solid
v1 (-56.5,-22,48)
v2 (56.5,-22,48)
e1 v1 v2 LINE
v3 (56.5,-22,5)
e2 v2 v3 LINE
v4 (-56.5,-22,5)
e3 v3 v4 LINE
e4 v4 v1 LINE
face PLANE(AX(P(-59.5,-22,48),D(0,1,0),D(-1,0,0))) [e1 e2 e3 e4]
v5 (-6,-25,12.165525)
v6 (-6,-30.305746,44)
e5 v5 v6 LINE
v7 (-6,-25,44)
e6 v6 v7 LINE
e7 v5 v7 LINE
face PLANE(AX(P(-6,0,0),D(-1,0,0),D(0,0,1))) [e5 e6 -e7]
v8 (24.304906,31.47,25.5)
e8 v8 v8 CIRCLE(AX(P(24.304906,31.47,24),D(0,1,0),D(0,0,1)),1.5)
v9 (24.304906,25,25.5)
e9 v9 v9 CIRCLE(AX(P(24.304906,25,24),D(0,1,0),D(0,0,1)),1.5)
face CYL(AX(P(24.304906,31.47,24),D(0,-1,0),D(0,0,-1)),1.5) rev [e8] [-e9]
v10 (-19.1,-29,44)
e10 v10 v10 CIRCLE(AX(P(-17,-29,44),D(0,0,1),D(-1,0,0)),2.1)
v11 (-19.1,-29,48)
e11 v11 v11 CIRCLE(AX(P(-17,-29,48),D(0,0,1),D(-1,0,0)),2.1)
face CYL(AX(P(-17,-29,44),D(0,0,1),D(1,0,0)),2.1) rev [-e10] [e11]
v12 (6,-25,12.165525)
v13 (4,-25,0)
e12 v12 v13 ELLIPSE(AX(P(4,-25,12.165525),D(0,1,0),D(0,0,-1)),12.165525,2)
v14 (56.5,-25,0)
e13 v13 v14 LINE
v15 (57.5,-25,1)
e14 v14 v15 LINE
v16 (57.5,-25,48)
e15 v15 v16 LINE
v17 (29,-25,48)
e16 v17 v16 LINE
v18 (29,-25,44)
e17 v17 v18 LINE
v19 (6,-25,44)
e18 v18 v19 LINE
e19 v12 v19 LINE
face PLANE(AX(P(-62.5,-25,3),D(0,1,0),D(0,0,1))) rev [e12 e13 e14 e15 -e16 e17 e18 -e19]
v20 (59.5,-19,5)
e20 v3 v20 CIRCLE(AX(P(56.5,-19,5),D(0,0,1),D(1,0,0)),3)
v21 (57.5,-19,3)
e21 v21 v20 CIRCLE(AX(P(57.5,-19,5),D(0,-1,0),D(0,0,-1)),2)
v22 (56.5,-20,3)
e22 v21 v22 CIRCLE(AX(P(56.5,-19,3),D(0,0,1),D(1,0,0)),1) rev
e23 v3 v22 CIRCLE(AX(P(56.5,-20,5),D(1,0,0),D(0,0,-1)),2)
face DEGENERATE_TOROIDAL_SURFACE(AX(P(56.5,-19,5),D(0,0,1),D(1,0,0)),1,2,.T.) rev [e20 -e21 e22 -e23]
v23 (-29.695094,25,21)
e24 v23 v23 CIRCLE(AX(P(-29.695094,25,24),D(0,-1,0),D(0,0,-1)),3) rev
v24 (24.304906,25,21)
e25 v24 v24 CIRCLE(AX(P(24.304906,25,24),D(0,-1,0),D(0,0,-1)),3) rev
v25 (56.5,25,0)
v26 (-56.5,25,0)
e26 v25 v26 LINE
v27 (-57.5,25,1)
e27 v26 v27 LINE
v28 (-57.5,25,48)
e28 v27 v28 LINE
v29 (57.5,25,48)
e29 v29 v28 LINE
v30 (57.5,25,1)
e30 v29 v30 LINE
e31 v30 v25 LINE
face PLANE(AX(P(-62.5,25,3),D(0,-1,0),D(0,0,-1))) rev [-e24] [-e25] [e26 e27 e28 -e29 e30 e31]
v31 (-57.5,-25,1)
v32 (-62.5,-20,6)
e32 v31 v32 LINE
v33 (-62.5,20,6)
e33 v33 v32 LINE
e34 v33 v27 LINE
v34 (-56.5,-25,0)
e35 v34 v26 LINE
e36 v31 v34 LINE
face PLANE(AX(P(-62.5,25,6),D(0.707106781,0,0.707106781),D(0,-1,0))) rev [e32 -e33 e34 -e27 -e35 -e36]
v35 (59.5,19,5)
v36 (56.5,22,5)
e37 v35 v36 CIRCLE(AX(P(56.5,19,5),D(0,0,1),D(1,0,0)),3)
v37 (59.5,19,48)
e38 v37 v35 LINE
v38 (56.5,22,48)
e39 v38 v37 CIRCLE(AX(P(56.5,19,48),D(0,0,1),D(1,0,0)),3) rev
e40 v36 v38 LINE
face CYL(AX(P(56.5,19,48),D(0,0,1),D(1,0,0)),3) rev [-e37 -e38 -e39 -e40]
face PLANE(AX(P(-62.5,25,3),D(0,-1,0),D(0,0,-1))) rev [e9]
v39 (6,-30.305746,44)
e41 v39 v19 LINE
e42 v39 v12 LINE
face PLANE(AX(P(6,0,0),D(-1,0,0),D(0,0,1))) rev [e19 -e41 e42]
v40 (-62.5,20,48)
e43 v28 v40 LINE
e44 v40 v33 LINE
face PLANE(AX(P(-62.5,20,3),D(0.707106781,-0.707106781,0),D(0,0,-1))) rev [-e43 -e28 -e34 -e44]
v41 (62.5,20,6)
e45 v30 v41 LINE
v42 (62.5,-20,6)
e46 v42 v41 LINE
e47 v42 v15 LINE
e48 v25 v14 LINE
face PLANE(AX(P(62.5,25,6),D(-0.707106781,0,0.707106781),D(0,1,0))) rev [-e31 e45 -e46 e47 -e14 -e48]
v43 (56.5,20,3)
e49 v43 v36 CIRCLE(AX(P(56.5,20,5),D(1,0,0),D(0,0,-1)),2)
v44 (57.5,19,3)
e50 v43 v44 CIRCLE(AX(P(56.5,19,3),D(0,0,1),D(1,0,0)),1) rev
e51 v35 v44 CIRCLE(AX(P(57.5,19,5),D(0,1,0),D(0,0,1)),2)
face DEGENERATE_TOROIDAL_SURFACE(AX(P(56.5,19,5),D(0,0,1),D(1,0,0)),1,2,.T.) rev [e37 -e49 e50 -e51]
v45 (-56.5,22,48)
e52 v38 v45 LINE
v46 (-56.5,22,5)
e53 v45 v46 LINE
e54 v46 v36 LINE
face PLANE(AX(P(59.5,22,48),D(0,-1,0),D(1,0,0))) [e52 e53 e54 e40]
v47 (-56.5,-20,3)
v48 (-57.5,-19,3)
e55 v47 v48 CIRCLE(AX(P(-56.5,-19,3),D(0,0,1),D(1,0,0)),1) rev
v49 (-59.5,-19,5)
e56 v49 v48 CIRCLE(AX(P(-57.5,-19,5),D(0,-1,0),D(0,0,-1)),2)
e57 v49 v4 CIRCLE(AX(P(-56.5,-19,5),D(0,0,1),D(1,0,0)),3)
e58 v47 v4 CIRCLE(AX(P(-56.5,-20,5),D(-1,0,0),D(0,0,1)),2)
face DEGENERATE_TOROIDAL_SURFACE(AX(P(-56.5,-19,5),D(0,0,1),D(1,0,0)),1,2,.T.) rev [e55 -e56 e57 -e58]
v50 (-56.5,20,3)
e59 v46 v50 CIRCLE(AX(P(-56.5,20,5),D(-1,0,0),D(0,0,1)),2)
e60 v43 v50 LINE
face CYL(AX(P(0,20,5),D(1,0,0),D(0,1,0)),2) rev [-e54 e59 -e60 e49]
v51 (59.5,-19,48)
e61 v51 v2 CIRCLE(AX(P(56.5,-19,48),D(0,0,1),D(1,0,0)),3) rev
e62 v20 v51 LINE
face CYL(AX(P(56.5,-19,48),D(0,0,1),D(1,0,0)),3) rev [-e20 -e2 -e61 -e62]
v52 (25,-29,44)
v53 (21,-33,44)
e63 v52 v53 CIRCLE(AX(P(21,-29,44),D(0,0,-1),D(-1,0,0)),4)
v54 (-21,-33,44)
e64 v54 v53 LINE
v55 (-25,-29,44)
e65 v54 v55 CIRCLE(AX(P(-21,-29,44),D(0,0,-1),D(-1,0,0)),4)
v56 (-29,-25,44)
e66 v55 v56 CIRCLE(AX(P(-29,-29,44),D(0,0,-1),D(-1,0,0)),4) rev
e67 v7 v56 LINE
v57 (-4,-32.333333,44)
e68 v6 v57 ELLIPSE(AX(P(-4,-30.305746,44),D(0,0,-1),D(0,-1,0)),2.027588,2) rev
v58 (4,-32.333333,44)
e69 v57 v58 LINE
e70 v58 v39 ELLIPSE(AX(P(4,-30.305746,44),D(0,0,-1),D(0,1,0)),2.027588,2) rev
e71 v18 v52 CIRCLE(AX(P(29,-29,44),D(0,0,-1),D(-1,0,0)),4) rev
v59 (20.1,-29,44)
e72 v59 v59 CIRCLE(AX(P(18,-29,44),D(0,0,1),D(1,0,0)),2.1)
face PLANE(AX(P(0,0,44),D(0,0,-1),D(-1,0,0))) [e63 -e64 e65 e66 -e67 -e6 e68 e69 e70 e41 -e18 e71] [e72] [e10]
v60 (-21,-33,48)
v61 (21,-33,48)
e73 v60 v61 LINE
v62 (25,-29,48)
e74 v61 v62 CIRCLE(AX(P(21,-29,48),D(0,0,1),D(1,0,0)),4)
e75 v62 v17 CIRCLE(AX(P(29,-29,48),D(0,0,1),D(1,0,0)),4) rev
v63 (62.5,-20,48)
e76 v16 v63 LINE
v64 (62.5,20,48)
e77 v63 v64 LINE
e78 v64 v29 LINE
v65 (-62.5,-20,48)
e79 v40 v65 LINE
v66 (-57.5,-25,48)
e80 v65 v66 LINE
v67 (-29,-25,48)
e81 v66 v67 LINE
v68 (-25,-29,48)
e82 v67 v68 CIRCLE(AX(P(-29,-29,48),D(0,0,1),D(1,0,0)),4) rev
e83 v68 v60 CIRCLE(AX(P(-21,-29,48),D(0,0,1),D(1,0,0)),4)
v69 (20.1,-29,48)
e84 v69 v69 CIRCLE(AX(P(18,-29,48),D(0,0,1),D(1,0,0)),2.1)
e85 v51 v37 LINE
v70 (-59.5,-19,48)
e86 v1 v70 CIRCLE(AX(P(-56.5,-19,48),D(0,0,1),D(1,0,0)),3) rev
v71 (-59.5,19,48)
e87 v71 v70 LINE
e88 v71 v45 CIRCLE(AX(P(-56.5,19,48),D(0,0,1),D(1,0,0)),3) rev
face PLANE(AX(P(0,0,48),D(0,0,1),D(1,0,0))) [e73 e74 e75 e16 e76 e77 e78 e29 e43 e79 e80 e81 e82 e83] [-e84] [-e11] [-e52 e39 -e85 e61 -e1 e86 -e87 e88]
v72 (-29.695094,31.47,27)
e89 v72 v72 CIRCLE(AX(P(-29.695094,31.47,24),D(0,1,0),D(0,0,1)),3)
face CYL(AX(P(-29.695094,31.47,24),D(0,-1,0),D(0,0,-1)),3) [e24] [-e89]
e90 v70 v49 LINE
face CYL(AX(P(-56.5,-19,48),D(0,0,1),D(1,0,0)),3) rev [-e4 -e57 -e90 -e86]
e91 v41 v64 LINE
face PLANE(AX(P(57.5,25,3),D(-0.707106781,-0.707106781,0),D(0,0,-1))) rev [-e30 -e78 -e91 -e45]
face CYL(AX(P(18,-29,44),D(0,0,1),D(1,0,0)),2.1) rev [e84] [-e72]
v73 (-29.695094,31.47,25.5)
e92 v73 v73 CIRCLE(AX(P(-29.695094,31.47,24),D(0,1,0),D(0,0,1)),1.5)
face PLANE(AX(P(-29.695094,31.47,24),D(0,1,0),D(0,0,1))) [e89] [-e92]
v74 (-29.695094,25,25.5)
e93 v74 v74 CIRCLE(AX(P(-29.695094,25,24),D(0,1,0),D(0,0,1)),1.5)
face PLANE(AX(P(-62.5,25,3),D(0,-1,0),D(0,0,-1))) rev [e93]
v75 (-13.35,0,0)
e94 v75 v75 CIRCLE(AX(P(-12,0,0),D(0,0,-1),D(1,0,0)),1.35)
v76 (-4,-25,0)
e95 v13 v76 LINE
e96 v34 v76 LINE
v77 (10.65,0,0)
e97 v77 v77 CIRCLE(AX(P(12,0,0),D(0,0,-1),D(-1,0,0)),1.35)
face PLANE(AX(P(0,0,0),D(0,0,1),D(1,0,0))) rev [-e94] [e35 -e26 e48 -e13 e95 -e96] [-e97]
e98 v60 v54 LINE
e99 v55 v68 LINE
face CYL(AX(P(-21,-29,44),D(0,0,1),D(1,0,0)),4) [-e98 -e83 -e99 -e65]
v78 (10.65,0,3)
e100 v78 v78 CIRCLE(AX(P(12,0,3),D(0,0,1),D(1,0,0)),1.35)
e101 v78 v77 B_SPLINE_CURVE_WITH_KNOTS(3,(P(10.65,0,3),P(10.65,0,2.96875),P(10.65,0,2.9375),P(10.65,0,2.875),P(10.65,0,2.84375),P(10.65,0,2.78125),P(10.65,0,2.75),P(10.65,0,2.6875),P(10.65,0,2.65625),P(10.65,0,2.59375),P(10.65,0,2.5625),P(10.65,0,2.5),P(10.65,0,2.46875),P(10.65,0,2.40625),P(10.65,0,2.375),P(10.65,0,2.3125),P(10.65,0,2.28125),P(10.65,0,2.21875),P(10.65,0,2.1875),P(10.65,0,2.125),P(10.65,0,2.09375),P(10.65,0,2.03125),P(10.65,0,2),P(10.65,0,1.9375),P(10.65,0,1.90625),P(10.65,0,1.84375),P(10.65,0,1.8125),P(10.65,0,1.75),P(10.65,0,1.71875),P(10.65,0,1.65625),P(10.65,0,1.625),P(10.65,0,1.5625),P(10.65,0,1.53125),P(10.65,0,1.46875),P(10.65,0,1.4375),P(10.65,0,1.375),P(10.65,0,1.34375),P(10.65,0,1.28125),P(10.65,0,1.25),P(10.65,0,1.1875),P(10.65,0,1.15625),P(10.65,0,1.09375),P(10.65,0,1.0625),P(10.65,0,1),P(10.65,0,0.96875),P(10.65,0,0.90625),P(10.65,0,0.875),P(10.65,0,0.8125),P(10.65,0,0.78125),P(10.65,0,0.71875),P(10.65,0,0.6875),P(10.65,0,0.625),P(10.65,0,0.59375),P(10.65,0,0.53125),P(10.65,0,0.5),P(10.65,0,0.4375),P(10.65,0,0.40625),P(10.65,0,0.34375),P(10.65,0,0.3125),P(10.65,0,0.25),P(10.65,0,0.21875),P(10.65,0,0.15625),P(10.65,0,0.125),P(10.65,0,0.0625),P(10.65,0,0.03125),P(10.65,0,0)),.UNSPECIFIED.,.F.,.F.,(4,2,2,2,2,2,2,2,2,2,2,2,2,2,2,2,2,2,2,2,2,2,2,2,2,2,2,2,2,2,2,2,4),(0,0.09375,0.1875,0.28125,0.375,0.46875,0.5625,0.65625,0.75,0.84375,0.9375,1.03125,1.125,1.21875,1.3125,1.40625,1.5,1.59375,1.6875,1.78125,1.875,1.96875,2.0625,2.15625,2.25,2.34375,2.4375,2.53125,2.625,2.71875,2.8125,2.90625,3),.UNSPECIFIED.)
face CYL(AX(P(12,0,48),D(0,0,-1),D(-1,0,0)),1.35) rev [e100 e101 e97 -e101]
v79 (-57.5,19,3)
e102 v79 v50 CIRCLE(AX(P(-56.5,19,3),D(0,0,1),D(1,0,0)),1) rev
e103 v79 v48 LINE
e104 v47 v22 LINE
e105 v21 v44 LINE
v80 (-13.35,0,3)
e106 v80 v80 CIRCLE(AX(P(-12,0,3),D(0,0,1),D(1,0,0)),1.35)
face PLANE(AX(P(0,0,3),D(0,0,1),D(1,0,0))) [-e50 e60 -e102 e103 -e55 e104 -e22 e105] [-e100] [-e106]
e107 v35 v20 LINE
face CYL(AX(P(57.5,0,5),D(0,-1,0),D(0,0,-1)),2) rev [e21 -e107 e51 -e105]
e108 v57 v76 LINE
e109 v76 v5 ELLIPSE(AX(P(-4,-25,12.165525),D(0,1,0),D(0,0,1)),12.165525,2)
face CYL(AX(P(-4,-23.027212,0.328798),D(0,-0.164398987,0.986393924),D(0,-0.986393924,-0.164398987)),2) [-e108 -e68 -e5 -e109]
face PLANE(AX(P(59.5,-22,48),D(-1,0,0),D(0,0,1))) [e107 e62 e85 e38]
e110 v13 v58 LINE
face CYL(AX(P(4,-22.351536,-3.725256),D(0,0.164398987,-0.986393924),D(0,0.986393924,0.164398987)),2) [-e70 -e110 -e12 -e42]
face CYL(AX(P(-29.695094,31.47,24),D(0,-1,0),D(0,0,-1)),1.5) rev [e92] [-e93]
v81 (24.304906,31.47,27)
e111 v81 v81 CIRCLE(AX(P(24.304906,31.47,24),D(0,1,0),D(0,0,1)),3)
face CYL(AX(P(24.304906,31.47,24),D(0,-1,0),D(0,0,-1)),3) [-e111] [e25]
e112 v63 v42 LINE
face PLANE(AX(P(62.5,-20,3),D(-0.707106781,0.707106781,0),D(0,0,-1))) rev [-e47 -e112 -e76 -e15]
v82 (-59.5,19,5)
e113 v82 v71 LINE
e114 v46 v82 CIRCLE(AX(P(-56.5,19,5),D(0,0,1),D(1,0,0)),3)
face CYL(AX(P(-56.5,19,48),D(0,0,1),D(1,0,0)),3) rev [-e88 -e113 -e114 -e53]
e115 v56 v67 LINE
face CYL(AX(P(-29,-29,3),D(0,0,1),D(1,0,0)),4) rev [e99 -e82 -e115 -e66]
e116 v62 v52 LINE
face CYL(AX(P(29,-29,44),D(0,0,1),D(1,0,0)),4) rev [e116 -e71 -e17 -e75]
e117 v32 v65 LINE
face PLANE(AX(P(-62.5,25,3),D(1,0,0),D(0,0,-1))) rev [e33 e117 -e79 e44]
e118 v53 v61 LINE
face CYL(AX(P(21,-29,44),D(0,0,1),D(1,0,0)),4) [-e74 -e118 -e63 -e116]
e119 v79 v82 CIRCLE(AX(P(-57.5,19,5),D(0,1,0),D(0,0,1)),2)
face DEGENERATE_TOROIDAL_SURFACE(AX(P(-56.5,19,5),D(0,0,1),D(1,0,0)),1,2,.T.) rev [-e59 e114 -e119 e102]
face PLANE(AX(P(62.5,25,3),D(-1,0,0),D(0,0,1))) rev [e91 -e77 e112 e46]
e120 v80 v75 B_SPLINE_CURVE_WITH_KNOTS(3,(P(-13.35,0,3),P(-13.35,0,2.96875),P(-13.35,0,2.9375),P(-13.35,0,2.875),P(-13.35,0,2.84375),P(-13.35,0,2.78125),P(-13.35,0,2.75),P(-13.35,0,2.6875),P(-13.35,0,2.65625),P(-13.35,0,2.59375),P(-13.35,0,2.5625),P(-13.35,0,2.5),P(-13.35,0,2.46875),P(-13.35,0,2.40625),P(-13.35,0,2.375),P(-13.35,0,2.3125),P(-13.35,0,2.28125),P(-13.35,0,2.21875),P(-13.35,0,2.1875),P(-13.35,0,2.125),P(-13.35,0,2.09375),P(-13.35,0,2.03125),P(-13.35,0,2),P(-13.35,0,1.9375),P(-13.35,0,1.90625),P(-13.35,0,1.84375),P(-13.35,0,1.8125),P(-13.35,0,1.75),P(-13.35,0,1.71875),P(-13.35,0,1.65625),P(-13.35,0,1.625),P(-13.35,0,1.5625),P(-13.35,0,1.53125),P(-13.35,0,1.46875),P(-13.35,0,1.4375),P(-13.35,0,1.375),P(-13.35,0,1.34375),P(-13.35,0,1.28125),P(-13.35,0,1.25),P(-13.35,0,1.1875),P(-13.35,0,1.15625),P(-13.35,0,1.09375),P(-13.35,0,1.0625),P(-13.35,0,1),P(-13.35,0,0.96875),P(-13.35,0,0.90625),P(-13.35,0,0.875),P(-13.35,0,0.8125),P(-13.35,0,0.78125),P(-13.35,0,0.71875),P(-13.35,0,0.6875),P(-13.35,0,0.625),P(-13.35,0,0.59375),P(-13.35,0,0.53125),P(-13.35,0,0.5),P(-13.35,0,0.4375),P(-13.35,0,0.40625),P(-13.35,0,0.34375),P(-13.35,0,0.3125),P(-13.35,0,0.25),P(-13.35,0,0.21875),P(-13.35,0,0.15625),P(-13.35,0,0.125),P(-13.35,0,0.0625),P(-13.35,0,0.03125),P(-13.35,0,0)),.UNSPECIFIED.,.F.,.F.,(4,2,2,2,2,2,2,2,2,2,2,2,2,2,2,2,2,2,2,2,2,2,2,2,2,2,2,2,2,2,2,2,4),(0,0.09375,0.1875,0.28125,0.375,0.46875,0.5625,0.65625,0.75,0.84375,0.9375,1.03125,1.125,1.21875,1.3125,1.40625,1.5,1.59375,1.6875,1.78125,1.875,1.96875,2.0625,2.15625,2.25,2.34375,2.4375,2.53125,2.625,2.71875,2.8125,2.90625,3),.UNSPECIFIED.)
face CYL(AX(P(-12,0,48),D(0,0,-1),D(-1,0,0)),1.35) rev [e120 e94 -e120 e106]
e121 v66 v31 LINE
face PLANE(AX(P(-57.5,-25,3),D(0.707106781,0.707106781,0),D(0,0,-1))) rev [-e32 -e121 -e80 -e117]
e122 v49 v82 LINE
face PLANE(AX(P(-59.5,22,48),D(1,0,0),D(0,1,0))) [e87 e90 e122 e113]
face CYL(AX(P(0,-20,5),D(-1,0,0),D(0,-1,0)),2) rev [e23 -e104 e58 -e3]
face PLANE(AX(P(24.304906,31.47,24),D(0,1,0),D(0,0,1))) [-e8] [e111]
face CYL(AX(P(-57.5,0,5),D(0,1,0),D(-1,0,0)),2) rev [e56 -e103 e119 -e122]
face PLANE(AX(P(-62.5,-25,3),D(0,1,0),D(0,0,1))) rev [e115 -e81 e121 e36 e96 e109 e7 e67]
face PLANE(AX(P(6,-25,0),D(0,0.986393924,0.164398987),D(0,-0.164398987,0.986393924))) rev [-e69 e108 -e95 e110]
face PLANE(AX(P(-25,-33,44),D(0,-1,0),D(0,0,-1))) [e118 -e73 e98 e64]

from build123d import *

# Parameters (mm, degrees)
SKETCH_1_W             = 125
SKETCH_1_H             = 50
EXTRUDE_1_DEPTH        = 3
SKETCH_2_W             = 125
SKETCH_2_H             = 50
SKETCH_2_W_2           = 119
SKETCH_2_H_2           = 44
EXTRUDE_2_DEPTH        = 45
EXTRUDE_START          = 33
EXTRUDE_3_DEPTH        = 12
SKETCH_6_W             = 50
SKETCH_6_H             = 8
SKETCH_6_R             = 2.1
EXTRUDE_7_DEPTH        = 4
FILLET_START           = 43
FILLET_10_DEPTH        = 5
FILLET_START_2         = 44
FILLET_10_2_DEPTH      = 4
CHAMFER_2_SIZE         = 6
FILLET_12_R            = 2
CHAMFER_3_SIZE         = 5
SKETCH_7_R             = 1.35
CUT_EXTRUDE_1_DEPTH    = 86.435648297
PATTERN_LINEAR_2_COUNT = 2
PATTERN_LINEAR_2_PITCH = 39
FILLET_13_R            = 2
SKETCH_8_W             = 12
SKETCH_8_H             = 8
CUT_EXTRUDE_2_DEPTH    = 86.435648297
FILLET_14_R            = 3
SKETCH_9_W             = 61.451933819
SKETCH_9_H             = 10.261376853
CUT_EXTRUDE_3_DEPTH    = 70
SKETCH_10_R            = 3
SKETCH_10_R_2          = 1.5
EXTRUDE_8_DEPTH        = 6.47


with BuildPart() as part:
    # 草图1 → 凸台-拉伸1 (new body)
    with BuildSketch(Plane.XY):
        Rectangle(SKETCH_1_W, SKETCH_1_H)
    extrude(amount=EXTRUDE_1_DEPTH)

    # 草图2 → 凸台-拉伸2 (add)
    with BuildSketch(Plane.XY.offset(3)):
        Rectangle(SKETCH_2_W, SKETCH_2_H)
        Rectangle(SKETCH_2_W_2, SKETCH_2_H_2, mode=Mode.SUBTRACT)
    extrude(amount=EXTRUDE_2_DEPTH)

    # 草图3 → 凸台-拉伸3 (add)
    with BuildSketch(Plane(origin=(0, 0, 0), x_dir=(0, 0, -1), z_dir=(1, 0, 0)).offset(EXTRUDE_START)):
        Polygon((0, 25), (-48, 33), (-48, 25), align=None)
        Polygon((-48, -25), (0, -25), (-48, -33), align=None)
    extrude_3 = extrude(amount=EXTRUDE_3_DEPTH)

    # 草图6 → 凸台-拉伸7 (add)
    # profile 1 of 2: a face of its own
    with BuildSketch(Plane.XY.offset(48)):
        with Locations((0, 29)):
            Rectangle(SKETCH_6_W, SKETCH_6_H)
        with Locations((-17, 29)):
            Circle(SKETCH_6_R, mode=Mode.SUBTRACT)
        with Locations((18, 29)):
            Circle(SKETCH_6_R, mode=Mode.SUBTRACT)
    # profile 2 of 2: a face of its own
    with BuildSketch(Plane.XY.offset(48)):
        with Locations((0, -29)):
            Rectangle(SKETCH_6_W, SKETCH_6_H)
        with Locations(Location((-17, -29, 0), (0, 0, 180))):
            Circle(SKETCH_6_R, mode=Mode.SUBTRACT)
        with Locations((18, -29)):
            Circle(SKETCH_6_R, mode=Mode.SUBTRACT)
    extrude(amount=-EXTRUDE_7_DEPTH)

    # 圆角10: read off the stored shape, not the designer's step
    # 圆角10 outline → 圆角10 (cut)
    with BuildSketch(Plane.XY.offset(FILLET_START)):
        with BuildLine():
            ThreePointArc((25, -29), (23.828427125, -31.828427125), (21, -33))
            Line((21, -33), (25, -33))
            Line((25, -33), (25, -29))
        make_face()
        with BuildLine():
            Line((-25, -33), (-21, -33))
            ThreePointArc((-21, -33), (-23.828427125, -31.828427125), (-25, -29))
            Line((-25, -29), (-25, -33))
        make_face()
        with BuildLine():
            ThreePointArc((-25, 29), (-23.828427125, 31.828427125), (-21, 33))
            Line((-21, 33), (-25, 33))
            Line((-25, 33), (-25, 29))
        make_face()
        with BuildLine():
            Line((25, 33), (21, 33))
            ThreePointArc((21, 33), (23.828427125, 31.828427125), (25, 29))
            Line((25, 29), (25, 33))
        make_face()
    extrude(amount=FILLET_10_DEPTH, mode=Mode.SUBTRACT)

    # Fillet 10 2 outline → Fillet 10 2 (add)
    with BuildSketch(Plane.XY.offset(FILLET_START_2)):
        with BuildLine():
            Line((25, -25), (25, -29))
            ThreePointArc((25, -29), (26.171572875, -26.171572875), (29, -25))
            Line((29, -25), (25, -25))
        make_face()
        with BuildLine():
            ThreePointArc((-29, -25), (-26.171572875, -26.171572875), (-25, -29))
            Line((-25, -29), (-25, -25))
            Line((-25, -25), (-29, -25))
        make_face()
        with BuildLine():
            Line((-25, 25), (-25, 29))
            ThreePointArc((-25, 29), (-26.171572875, 26.171572875), (-29, 25))
            Line((-29, 25), (-25, 25))
        make_face()
        with BuildLine():
            ThreePointArc((29, 25), (26.171572875, 26.171572875), (25, 29))
            Line((25, 29), (25, 25))
            Line((25, 25), (29, 25))
        make_face()
    extrude(amount=FILLET_10_2_DEPTH)

    # 倒角2
    chamfer_2_edges = [part.edges().sort_by_distance(p)[0] for p in [
        (-62.5, 0, 0),
        (62.5, 0, 0),
    ]]
    chamfer(chamfer_2_edges, length=CHAMFER_2_SIZE)

    # 圆角12
    fillet_12_edges = [part.edges().sort_by_distance(p)[0] for p in [
        (0, -22, 3),
        (59.5, 0, 3),
        (0, 22, 3),
        (-59.5, 0, 3),
    ]]
    fillet(fillet_12_edges, radius=FILLET_12_R)

    # 倒角3
    chamfer_3_edges = [part.edges().sort_by_distance(p)[0] for p in [
        (62.5, -25, 27),
        (-62.5, -25, 27),
        (-62.5, 25, 27),
        (62.5, 25, 27),
    ]]
    chamfer(chamfer_3_edges, length=CHAMFER_3_SIZE)

    # 草图7 → 切除-拉伸1 (cut, through all)
    with BuildSketch(Plane(origin=(0, 0, 0), x_dir=(-1, 0, 0), z_dir=(0, 0, -1))):
        with Locations((-12, 0)):
            Circle(SKETCH_7_R)
        with Locations((12, 0)):
            Circle(SKETCH_7_R)
    extrude(amount=-CUT_EXTRUDE_1_DEPTH, mode=Mode.SUBTRACT)

    # 阵列(线性)2: 凸台-拉伸3 ×2
    with Locations(*[(-i * PATTERN_LINEAR_2_PITCH, 0, 0) for i in range(1, PATTERN_LINEAR_2_COUNT)]):
        add(extrude_3)

    # 圆角13
    fillet_13_edges = [part.edges().sort_by_distance(p)[0] for p in [
        (-6, 28.666666667, 22),
        (6, 28.666666667, 22),
        (-6, -28.666666667, 22),
        (6, -28.666666667, 22),
    ]]
    fillet(fillet_13_edges, radius=FILLET_13_R)

    # 草图8 → 切除-拉伸2 (cut, through all)
    with BuildSketch(Plane.XY.offset(48)):
        with Locations((39, 29)):
            Rectangle(SKETCH_8_W, SKETCH_8_H)
        with Locations((39, -29)):
            Rectangle(SKETCH_8_W, SKETCH_8_H)
    extrude(amount=-CUT_EXTRUDE_2_DEPTH, mode=Mode.SUBTRACT)

    # 圆角14
    # the kernel refuses this fillet: 3 mm, written as the material it adds along each edge
    with BuildSketch(Plane(origin=(56.5, 19, 3), x_dir=(0, 1, 0), z_dir=(-1, 0, 0))) as fillet_14_piece_1:
        with BuildLine():
            CenterArc((1, -2), 2, 0, 90)
            Line((3, -2), (3, 0))
            Line((3, 0), (1, 0))
        make_face()
    revolve(axis=Axis((56.5, 19, 3), (0, 0, -1)), revolution_arc=90)
    with BuildSketch(Plane(origin=(56.5, -19, 3), x_dir=(1, 0, 0), z_dir=(0, 1, 0))) as fillet_14_piece_2:
        with BuildLine():
            CenterArc((1, -2), 2, 0, 90)
            Line((3, -2), (3, 0))
            Line((3, 0), (1, 0))
        make_face()
    revolve(axis=Axis((56.5, -19, 3), (0, 0, -1)), revolution_arc=90)
    with BuildSketch(Plane(origin=(-56.5, 19, 3), x_dir=(-1, 0, 0), z_dir=(0, -1, 0))) as fillet_14_piece_3:
        with BuildLine():
            CenterArc((1, -2), 2, 0, 90)
            Line((3, -2), (3, 0))
            Line((3, 0), (1, 0))
        make_face()
    revolve(axis=Axis((-56.5, 19, 3), (0, 0, -1)), revolution_arc=90)
    with BuildSketch(Plane(origin=(-56.5, -19, 3), x_dir=(0, -1, 0), z_dir=(1, 0, 0))) as fillet_14_piece_4:
        with BuildLine():
            CenterArc((1, -2), 2, 0, 90)
            Line((3, -2), (3, 0))
            Line((3, 0), (1, 0))
        make_face()
    revolve(axis=Axis((-56.5, -19, 3), (0, 0, -1)), revolution_arc=90)
    with BuildSketch(Plane(origin=(59.5, -22, 3), x_dir=(0, 1, 0), z_dir=(0, 0, 1))) as fillet_14_piece_5:
        with BuildLine():
            CenterArc((FILLET_14_R, FILLET_14_R), FILLET_14_R, 180, 90)
            Line((0, FILLET_14_R), (0, 0))
            Line((0, 0), (FILLET_14_R, 0))
        make_face()
    extrude(amount=45)
    with BuildSketch(Plane(origin=(59.5, 22, 3), x_dir=(0, -1, 0), z_dir=(0, 0, 1)), Plane(origin=(-59.5, 22, 3), x_dir=(1, 0, 0), z_dir=(0, 0, 1)), Plane(origin=(-59.5, -22, 3), x_dir=(0, 1, 0), z_dir=(0, 0, 1))) as fillet_14_piece_6:
        with BuildLine():
            CenterArc((FILLET_14_R, -FILLET_14_R), FILLET_14_R, 90, 90)
            Line((0, -FILLET_14_R), (0, 0))
            Line((0, 0), (FILLET_14_R, 0))
        make_face()
    extrude(amount=45)

    # 草图9 → 切除-拉伸3 (cut)
    with BuildSketch(Plane(origin=(0, 0, 0), x_dir=(-1, 0, 0), z_dir=(0, 0, -1))):
        with Locations((1.72596691, 30.130688427)):
            Rectangle(SKETCH_9_W, SKETCH_9_H)
    extrude(amount=-CUT_EXTRUDE_3_DEPTH, mode=Mode.SUBTRACT)

    # 草图10 → 凸台-拉伸8 (add)
    # profile 1 of 2: a face of its own
    with BuildSketch(Plane(origin=(0, 25, 0), x_dir=(1, 0, 0), z_dir=(0, 1, 0))):
        with Locations(Location((-29.695093854, -24, 0), (0, 0, 90))):
            Circle(SKETCH_10_R)
        with Locations(Location((-29.695093854, -24, 0), (0, 0, 270))):
            Circle(SKETCH_10_R_2, mode=Mode.SUBTRACT)
    # profile 2 of 2: a face of its own
    with BuildSketch(Plane(origin=(0, 25, 0), x_dir=(1, 0, 0), z_dir=(0, 1, 0))):
        with Locations(Location((24.304906146, -24, 0), (0, 0, 90))):
            Circle(SKETCH_10_R)
        with Locations(Location((24.304906146, -24, 0), (0, 0, 270))):
            Circle(SKETCH_10_R_2, mode=Mode.SUBTRACT)
    extrude(amount=EXTRUDE_8_DEPTH)


solid = part.part
